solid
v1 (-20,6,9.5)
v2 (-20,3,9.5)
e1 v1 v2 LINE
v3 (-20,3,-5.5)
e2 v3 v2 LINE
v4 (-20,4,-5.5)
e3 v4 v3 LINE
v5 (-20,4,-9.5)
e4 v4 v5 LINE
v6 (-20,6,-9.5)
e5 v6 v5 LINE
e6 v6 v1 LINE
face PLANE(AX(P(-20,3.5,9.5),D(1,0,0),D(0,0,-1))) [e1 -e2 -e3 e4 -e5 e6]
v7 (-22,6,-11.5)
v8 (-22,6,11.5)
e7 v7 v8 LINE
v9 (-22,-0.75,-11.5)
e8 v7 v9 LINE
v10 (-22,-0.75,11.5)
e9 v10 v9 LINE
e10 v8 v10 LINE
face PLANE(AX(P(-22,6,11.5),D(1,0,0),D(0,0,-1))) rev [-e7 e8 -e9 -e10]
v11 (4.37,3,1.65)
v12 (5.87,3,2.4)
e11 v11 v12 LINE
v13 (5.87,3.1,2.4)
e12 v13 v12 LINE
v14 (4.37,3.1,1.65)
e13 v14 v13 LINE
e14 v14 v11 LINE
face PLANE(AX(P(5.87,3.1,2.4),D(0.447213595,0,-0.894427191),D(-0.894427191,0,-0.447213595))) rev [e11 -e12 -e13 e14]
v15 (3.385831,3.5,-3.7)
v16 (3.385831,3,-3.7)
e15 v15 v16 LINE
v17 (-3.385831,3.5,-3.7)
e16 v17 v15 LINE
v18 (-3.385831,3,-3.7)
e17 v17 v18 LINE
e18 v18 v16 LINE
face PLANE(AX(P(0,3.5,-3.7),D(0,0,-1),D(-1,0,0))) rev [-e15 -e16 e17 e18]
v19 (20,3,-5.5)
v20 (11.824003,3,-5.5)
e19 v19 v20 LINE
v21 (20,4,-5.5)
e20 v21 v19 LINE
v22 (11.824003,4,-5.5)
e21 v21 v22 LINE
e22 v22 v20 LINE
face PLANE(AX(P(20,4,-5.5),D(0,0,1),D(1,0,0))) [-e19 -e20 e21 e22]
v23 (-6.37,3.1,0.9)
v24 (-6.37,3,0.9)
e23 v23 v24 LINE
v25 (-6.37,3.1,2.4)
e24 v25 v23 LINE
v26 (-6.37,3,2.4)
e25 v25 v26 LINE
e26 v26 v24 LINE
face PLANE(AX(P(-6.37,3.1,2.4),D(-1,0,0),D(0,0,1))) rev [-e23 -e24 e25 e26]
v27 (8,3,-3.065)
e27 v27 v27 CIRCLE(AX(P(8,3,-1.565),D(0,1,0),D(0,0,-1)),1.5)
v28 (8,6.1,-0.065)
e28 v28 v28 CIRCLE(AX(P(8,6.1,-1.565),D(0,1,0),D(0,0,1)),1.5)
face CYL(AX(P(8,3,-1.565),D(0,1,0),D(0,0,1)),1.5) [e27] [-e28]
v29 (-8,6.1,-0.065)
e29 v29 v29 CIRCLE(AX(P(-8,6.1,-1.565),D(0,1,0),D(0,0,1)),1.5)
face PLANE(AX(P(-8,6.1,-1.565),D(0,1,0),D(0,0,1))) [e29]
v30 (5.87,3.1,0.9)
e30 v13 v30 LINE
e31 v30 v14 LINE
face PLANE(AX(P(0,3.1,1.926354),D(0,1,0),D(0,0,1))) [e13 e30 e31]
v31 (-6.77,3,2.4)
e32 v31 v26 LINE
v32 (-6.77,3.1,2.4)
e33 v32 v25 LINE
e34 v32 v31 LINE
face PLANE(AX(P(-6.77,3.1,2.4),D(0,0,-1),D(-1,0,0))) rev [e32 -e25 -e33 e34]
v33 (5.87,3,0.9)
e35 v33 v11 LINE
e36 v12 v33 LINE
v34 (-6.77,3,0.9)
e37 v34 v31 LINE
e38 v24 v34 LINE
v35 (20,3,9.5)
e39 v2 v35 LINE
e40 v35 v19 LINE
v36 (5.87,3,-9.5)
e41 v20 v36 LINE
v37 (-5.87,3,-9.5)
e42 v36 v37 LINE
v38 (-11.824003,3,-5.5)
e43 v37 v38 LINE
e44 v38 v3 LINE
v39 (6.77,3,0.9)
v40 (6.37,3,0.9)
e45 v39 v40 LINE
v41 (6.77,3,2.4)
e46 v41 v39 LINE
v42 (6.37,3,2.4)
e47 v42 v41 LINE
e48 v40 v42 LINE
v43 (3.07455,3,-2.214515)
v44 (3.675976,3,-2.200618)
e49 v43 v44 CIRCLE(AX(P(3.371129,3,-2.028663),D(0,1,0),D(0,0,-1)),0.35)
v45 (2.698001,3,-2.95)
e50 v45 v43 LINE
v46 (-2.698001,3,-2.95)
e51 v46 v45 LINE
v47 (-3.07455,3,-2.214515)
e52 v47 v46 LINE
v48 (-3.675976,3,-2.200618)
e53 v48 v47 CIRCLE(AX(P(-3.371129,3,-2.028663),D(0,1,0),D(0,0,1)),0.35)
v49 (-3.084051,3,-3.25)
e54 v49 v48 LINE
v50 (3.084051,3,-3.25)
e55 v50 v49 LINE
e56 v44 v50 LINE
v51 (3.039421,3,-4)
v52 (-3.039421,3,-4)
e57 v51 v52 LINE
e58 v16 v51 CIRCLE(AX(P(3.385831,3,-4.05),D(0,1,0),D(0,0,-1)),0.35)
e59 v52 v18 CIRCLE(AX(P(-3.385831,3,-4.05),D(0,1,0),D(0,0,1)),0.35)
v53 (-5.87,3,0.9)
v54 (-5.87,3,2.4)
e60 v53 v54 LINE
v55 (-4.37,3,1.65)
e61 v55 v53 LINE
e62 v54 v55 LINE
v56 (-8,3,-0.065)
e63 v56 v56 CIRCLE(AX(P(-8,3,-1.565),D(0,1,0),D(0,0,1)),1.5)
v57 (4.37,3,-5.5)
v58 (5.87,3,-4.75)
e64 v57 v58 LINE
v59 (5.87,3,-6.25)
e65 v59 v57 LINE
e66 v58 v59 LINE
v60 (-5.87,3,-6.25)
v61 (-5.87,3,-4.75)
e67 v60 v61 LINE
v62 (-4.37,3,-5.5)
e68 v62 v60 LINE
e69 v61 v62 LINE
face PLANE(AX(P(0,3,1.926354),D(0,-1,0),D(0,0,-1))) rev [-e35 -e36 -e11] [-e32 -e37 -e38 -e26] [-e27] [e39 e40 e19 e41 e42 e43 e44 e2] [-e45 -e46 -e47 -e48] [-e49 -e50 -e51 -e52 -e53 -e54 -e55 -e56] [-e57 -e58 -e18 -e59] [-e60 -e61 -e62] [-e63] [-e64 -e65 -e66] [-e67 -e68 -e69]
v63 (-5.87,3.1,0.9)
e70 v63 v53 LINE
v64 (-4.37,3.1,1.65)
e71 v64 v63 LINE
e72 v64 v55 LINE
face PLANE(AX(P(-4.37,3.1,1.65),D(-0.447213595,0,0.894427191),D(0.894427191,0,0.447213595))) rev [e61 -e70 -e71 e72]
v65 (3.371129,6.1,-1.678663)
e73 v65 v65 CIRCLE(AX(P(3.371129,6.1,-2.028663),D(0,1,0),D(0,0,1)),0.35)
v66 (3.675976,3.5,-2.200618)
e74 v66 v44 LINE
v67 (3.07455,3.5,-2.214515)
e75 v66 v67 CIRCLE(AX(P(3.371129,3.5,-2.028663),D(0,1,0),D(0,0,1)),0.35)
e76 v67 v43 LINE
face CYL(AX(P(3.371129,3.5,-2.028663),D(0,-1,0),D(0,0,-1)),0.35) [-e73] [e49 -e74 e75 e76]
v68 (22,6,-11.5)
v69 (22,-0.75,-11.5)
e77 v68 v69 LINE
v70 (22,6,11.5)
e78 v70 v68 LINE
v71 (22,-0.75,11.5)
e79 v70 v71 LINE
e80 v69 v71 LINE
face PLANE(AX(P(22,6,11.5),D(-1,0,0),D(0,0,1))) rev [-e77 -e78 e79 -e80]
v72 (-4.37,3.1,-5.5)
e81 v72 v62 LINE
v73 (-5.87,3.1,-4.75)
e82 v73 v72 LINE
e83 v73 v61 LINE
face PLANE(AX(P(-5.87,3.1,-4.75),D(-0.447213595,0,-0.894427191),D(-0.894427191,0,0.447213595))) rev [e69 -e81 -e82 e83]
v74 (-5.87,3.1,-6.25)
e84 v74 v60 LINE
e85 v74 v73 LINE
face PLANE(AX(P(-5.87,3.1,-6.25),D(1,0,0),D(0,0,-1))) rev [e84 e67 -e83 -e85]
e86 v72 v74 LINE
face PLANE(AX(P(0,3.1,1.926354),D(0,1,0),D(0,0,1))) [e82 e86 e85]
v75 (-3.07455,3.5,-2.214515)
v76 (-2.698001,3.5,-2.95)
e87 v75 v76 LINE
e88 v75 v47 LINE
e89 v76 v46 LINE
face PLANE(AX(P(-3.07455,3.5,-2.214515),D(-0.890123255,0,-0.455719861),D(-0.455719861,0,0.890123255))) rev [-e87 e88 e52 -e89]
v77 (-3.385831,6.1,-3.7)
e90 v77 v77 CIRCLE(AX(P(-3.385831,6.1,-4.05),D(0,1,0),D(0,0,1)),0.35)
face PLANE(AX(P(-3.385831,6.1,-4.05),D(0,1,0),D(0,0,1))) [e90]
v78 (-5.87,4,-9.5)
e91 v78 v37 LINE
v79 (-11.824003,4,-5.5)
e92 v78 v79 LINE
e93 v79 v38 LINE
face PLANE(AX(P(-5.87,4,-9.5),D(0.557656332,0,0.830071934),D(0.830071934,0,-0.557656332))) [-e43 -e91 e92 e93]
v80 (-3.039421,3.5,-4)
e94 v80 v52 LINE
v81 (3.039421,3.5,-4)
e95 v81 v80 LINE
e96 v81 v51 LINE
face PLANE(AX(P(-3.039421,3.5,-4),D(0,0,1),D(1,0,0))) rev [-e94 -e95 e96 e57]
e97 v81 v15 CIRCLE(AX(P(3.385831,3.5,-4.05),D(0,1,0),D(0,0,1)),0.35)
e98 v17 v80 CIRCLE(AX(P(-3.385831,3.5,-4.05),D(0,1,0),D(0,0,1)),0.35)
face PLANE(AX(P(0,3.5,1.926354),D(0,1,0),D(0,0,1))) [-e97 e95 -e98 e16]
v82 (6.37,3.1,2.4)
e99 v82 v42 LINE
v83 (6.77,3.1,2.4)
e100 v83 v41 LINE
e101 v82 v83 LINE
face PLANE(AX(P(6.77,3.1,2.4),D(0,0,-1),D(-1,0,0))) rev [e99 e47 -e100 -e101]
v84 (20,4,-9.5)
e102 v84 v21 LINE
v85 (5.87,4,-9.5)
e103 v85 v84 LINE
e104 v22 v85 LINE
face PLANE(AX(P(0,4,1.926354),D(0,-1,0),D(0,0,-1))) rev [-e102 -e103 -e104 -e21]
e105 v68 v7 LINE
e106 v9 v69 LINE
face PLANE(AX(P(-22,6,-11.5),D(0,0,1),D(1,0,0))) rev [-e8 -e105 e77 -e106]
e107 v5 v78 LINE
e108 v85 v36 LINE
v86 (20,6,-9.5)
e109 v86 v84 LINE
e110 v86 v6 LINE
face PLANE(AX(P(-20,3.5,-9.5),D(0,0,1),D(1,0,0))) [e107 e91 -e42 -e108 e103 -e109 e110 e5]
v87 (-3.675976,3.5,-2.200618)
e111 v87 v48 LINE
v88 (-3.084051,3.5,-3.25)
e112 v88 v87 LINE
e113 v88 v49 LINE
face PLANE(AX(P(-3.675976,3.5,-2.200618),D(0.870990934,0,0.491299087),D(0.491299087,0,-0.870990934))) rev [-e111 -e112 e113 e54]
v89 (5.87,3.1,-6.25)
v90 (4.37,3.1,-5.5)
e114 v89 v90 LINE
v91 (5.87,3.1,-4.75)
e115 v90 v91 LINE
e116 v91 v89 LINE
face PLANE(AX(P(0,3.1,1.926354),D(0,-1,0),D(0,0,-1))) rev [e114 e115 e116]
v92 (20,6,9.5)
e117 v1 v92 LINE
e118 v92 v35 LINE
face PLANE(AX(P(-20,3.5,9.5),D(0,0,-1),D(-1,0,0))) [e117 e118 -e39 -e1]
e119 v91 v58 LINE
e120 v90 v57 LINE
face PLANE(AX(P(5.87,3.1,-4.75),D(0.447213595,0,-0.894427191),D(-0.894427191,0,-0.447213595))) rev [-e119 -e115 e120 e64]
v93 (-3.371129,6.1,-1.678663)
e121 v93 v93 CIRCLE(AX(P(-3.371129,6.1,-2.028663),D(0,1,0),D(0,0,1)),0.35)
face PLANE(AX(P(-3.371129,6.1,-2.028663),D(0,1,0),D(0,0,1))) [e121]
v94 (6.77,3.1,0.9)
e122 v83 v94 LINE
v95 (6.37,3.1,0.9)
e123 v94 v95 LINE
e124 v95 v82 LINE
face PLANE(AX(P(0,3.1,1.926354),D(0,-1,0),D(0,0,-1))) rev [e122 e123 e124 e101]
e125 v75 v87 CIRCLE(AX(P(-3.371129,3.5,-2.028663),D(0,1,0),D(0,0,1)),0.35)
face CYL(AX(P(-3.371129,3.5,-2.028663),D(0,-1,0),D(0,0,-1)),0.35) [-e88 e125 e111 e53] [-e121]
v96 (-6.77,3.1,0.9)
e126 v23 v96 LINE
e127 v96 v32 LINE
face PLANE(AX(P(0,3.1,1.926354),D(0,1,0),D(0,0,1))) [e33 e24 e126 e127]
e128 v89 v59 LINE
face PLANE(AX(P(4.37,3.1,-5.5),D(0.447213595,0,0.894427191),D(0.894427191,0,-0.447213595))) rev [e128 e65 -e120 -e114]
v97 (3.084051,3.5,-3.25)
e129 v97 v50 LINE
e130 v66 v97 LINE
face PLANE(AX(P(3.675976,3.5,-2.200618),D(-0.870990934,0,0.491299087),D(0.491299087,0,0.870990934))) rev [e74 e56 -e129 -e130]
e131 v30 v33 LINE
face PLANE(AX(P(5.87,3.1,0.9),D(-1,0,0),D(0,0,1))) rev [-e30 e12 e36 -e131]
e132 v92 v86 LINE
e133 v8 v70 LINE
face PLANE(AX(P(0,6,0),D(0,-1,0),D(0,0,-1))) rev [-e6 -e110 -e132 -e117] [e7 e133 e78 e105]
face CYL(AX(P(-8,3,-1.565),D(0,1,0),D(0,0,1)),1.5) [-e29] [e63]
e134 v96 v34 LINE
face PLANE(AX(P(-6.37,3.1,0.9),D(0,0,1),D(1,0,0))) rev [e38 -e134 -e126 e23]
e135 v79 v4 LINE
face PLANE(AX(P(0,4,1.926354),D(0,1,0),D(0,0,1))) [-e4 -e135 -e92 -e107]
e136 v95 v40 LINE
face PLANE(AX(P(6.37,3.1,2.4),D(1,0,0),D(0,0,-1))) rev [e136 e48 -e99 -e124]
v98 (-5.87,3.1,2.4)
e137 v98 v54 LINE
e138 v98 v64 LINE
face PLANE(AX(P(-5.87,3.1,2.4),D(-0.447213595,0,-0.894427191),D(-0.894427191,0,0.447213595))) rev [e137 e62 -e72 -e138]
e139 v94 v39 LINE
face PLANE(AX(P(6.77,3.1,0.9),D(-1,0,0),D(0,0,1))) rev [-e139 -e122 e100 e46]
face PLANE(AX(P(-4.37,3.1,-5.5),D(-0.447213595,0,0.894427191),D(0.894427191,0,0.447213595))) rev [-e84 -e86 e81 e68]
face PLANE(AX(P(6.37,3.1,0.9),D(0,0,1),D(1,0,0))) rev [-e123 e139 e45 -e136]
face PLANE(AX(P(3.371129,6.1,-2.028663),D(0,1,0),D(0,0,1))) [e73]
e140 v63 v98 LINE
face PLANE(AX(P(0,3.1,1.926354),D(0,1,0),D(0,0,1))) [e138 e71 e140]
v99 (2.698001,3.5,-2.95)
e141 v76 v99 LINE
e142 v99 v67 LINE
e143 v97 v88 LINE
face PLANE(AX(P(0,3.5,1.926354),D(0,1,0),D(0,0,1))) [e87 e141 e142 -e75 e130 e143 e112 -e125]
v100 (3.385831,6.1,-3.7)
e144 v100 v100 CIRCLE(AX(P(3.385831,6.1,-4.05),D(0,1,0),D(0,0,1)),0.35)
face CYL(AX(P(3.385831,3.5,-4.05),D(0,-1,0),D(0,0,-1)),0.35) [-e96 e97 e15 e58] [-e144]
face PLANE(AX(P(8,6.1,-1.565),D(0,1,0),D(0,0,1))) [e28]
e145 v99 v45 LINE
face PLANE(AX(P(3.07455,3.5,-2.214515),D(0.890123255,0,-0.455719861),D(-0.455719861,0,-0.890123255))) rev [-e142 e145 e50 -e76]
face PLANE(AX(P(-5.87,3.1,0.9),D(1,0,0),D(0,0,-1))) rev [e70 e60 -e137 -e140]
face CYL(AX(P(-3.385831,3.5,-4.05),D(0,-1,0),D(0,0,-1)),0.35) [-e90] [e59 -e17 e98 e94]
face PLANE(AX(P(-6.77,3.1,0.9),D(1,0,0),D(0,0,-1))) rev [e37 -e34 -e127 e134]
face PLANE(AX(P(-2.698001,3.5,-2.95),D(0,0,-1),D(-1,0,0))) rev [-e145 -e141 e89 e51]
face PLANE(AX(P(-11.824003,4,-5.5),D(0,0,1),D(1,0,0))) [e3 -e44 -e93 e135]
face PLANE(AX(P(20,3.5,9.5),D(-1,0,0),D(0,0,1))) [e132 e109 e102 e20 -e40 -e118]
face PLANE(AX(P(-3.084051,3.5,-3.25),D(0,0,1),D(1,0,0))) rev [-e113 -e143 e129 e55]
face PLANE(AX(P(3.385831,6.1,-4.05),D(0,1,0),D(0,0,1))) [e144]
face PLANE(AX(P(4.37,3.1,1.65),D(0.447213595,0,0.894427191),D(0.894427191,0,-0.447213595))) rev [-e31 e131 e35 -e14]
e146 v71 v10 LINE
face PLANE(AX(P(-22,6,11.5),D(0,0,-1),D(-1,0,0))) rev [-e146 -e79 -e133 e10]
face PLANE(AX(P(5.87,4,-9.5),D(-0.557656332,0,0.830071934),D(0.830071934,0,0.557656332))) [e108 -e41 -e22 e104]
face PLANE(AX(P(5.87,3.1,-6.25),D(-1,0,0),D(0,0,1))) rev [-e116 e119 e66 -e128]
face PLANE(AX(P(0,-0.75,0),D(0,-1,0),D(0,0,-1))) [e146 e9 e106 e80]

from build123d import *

# Parameters (mm, degrees)
SKETCH1_W           = 44
SKETCH1_H           = 23
BOSS_EXTRUDE1_DEPTH = 6
SKETCH2_W           = 44
SKETCH2_H           = 23
BOSS_EXTRUDE2_DEPTH = 0.75
CAVITY1_START       = 3
CAVITY1_OUTLINE_W   = 0.4
CAVITY1_OUTLINE_H   = 1.5
CAVITY1_OUTLINE_R   = 1.5
CAVITY1_DEPTH       = 3
CAVITY1_START_2     = 4
CAVITY1_2_OUTLINE_W = 0.4
CAVITY1_2_OUTLINE_H = 1.5
CAVITY1_2_DEPTH     = 2
CAVITY1_START_3     = 3.1
CAVITY1_3_OUTLINE_W = 0.4
CAVITY1_3_OUTLINE_H = 1.5
CAVITY1_3_DEPTH     = 0.9
CAVITY1_START_4     = 3.5
CAVITY1_4_DEPTH     = 0.5
SKETCH5_R           = 1.5
SKETCH5_R_2         = 0.35
BOSS_EXTRUDE3_DEPTH = 0.1


# Read off the part's stored shape, not the designer's step: Cavity1
with BuildPart() as part:
    # Sketch1 → Boss-Extrude1 (new body)
    with BuildSketch(Plane(origin=(0, 0, 0), x_dir=(1, 0, 0), z_dir=(0, 1, 0))):
        Rectangle(SKETCH1_W, SKETCH1_H)
    extrude(amount=BOSS_EXTRUDE1_DEPTH)

    # Sketch2 → Boss-Extrude2 (add)
    with BuildSketch(Plane.XZ):
        Rectangle(SKETCH2_W, SKETCH2_H)
    extrude(amount=BOSS_EXTRUDE2_DEPTH)

    # Cavity1 outline → Cavity1 (cut)
    with BuildSketch(Plane(origin=(0, 0, 0), x_dir=(1, 0, 0), z_dir=(0, 1, 0)).offset(CAVITY1_START)):
        Polygon((20, -9.5), (20, 5.5), (11.824003475, 5.5), (5.87, 9.5), (-5.87, 9.5), (-11.824003475, 5.5), (-20, 5.5), (-20, -9.5), align=None)
        with Locations((-6.57, -1.65)):
            Rectangle(CAVITY1_OUTLINE_W, CAVITY1_OUTLINE_H, mode=Mode.SUBTRACT)
        Polygon((-5.87, -2.4), (-5.87, -0.9), (-4.37, -1.65), align=None, mode=Mode.SUBTRACT)
        Polygon((4.37, -1.65), (5.87, -0.9), (5.87, -2.4), align=None, mode=Mode.SUBTRACT)
        with Locations((6.57, -1.65)):
            Rectangle(CAVITY1_OUTLINE_W, CAVITY1_OUTLINE_H, mode=Mode.SUBTRACT)
        with Locations((-8, 1.565)):
            Circle(CAVITY1_OUTLINE_R, mode=Mode.SUBTRACT)
        Polygon((-4.37, 5.5), (-5.87, 4.75), (-5.87, 6.25), align=None, mode=Mode.SUBTRACT)
        with Locations((8, 1.565)):
            Circle(CAVITY1_OUTLINE_R, mode=Mode.SUBTRACT)
        with BuildLine():
            ThreePointArc((-3.0745499, 2.214515103), (-3.36304333, 1.678756458), (-3.67597558, 2.200617734))
            Line((-3.67597558, 2.200617734), (-3.084051452, 3.25))
            Line((-3.084051452, 3.25), (3.084051452, 3.25))
            Line((3.084051452, 3.25), (3.67597558, 2.200617734))
            ThreePointArc((3.67597558, 2.200617734), (3.36304333, 1.678756458), (3.0745499, 2.214515103))
            Line((3.0745499, 2.214515103), (2.698000841, 2.95))
            Line((2.698000841, 2.95), (-2.698000841, 2.95))
            Line((-2.698000841, 2.95), (-3.0745499, 2.214515103))
        make_face(mode=Mode.SUBTRACT)
        with BuildLine():
            ThreePointArc((3.039420657, 4), (3.614959604, 4.314575131), (3.385830819, 3.7))
            Line((3.385830819, 3.7), (-3.385830819, 3.7))
            ThreePointArc((-3.385830819, 3.7), (-3.614959604, 4.314575131), (-3.039420657, 4))
            Line((-3.039420657, 4), (3.039420657, 4))
        make_face(mode=Mode.SUBTRACT)
        Polygon((4.37, 5.5), (5.87, 6.25), (5.87, 4.75), align=None, mode=Mode.SUBTRACT)
    extrude(amount=CAVITY1_DEPTH, mode=Mode.SUBTRACT)

    # Cavity1 2 outline → Cavity1 2 (cut)
    with BuildSketch(Plane(origin=(0, 0, 0), x_dir=(1, 0, 0), z_dir=(0, 1, 0)).offset(CAVITY1_START_2)):
        Polygon((20, 5.5), (20, 9.5), (5.87, 9.5), (11.824003475, 5.5), align=None)
        Polygon((-11.824003475, 5.5), (-5.87, 9.5), (-20, 9.5), (-20, 5.5), align=None)
        with BuildLine():
            ThreePointArc((3.385830819, 3.7), (3.156702034, 3.785424869), (3.039420657, 4))
            Line((3.039420657, 4), (-3.039420657, 4))
            ThreePointArc((-3.039420657, 4), (-3.156702034, 3.785424869), (-3.385830819, 3.7))
            Line((-3.385830819, 3.7), (3.385830819, 3.7))
        make_face()
        with BuildLine():
            ThreePointArc((-3.67597558, 2.200617734), (-3.379214176, 2.37856965), (-3.0745499, 2.214515103))
            Line((-3.0745499, 2.214515103), (-2.698000841, 2.95))
            Line((-2.698000841, 2.95), (2.698000841, 2.95))
            Line((2.698000841, 2.95), (3.0745499, 2.214515103))
            ThreePointArc((3.0745499, 2.214515103), (3.379214176, 2.37856965), (3.67597558, 2.200617734))
            Line((3.67597558, 2.200617734), (3.084051452, 3.25))
            Line((3.084051452, 3.25), (-3.084051452, 3.25))
            Line((-3.084051452, 3.25), (-3.67597558, 2.200617734))
        make_face()
        Polygon((5.87, 4.75), (5.87, 6.25), (4.37, 5.5), align=None)
        Polygon((5.87, -2.4), (5.87, -0.9), (4.37, -1.65), align=None)
        Polygon((-4.37, -1.65), (-5.87, -0.9), (-5.87, -2.4), align=None)
        Polygon((-5.87, 6.25), (-5.87, 4.75), (-4.37, 5.5), align=None)
        with Locations((-6.57, -1.65)):
            Rectangle(CAVITY1_2_OUTLINE_W, CAVITY1_2_OUTLINE_H)
        with Locations((6.57, -1.65)):
            Rectangle(CAVITY1_2_OUTLINE_W, CAVITY1_2_OUTLINE_H)
    extrude(amount=CAVITY1_2_DEPTH, mode=Mode.SUBTRACT)

    # Cavity1 3 outline → Cavity1 3 (cut)
    with BuildSketch(Plane(origin=(0, 0, 0), x_dir=(1, 0, 0), z_dir=(0, 1, 0)).offset(CAVITY1_START_3)):
        Polygon((5.87, 4.75), (5.87, 6.25), (4.37, 5.5), align=None)
        Polygon((5.87, -2.4), (5.87, -0.9), (4.37, -1.65), align=None)
        Polygon((-4.37, -1.65), (-5.87, -0.9), (-5.87, -2.4), align=None)
        Polygon((-5.87, 6.25), (-5.87, 4.75), (-4.37, 5.5), align=None)
        with Locations((-6.57, -1.65)):
            Rectangle(CAVITY1_3_OUTLINE_W, CAVITY1_3_OUTLINE_H)
        with Locations((6.57, -1.65)):
            Rectangle(CAVITY1_3_OUTLINE_W, CAVITY1_3_OUTLINE_H)
    extrude(amount=CAVITY1_3_DEPTH, mode=Mode.SUBTRACT)

    # Cavity1 4 outline → Cavity1 4 (cut)
    with BuildSketch(Plane(origin=(0, 0, 0), x_dir=(1, 0, 0), z_dir=(0, 1, 0)).offset(CAVITY1_START_4)):
        with BuildLine():
            ThreePointArc((3.385830819, 3.7), (3.156702034, 3.785424869), (3.039420657, 4))
            Line((3.039420657, 4), (-3.039420657, 4))
            ThreePointArc((-3.039420657, 4), (-3.156702034, 3.785424869), (-3.385830819, 3.7))
            Line((-3.385830819, 3.7), (3.385830819, 3.7))
        make_face()
        with BuildLine():
            ThreePointArc((-3.67597558, 2.200617734), (-3.379214176, 2.37856965), (-3.0745499, 2.214515103))
            Line((-3.0745499, 2.214515103), (-2.698000841, 2.95))
            Line((-2.698000841, 2.95), (2.698000841, 2.95))
            Line((2.698000841, 2.95), (3.0745499, 2.214515103))
            ThreePointArc((3.0745499, 2.214515103), (3.379214176, 2.37856965), (3.67597558, 2.200617734))
            Line((3.67597558, 2.200617734), (3.084051452, 3.25))
            Line((3.084051452, 3.25), (-3.084051452, 3.25))
            Line((-3.084051452, 3.25), (-3.67597558, 2.200617734))
        make_face()
    extrude(amount=CAVITY1_4_DEPTH, mode=Mode.SUBTRACT)

    # Sketch5 → Boss-Extrude3 (add)
    with BuildSketch(Plane(origin=(0, 6, 0), x_dir=(1, 0, 0), z_dir=(0, 1, 0))):
        with Locations(Location((-8, 1.565, 0), (0, 0, 270))):
            Circle(SKETCH5_R)
        with Locations(Location((8, 1.565, 0), (0, 0, 270))):
            Circle(SKETCH5_R)
        with Locations(Location((-3.385830819, 4.05, 0), (0, 0, 270))):
            Circle(SKETCH5_R_2)
        with Locations(Location((-3.371128753, 2.028663054, 0), (0, 0, 32.073441705))):
            Circle(SKETCH5_R_2)
        with Locations(Location((3.385830819, 4.05, 0), (0, 0, 270))):
            Circle(SKETCH5_R_2)
        with Locations(Location((3.371128753, 2.028663054, 0), (0, 0, 147.926558295))):
            Circle(SKETCH5_R_2)
    extrude(amount=BOSS_EXTRUDE3_DEPTH)


solid = part.part
